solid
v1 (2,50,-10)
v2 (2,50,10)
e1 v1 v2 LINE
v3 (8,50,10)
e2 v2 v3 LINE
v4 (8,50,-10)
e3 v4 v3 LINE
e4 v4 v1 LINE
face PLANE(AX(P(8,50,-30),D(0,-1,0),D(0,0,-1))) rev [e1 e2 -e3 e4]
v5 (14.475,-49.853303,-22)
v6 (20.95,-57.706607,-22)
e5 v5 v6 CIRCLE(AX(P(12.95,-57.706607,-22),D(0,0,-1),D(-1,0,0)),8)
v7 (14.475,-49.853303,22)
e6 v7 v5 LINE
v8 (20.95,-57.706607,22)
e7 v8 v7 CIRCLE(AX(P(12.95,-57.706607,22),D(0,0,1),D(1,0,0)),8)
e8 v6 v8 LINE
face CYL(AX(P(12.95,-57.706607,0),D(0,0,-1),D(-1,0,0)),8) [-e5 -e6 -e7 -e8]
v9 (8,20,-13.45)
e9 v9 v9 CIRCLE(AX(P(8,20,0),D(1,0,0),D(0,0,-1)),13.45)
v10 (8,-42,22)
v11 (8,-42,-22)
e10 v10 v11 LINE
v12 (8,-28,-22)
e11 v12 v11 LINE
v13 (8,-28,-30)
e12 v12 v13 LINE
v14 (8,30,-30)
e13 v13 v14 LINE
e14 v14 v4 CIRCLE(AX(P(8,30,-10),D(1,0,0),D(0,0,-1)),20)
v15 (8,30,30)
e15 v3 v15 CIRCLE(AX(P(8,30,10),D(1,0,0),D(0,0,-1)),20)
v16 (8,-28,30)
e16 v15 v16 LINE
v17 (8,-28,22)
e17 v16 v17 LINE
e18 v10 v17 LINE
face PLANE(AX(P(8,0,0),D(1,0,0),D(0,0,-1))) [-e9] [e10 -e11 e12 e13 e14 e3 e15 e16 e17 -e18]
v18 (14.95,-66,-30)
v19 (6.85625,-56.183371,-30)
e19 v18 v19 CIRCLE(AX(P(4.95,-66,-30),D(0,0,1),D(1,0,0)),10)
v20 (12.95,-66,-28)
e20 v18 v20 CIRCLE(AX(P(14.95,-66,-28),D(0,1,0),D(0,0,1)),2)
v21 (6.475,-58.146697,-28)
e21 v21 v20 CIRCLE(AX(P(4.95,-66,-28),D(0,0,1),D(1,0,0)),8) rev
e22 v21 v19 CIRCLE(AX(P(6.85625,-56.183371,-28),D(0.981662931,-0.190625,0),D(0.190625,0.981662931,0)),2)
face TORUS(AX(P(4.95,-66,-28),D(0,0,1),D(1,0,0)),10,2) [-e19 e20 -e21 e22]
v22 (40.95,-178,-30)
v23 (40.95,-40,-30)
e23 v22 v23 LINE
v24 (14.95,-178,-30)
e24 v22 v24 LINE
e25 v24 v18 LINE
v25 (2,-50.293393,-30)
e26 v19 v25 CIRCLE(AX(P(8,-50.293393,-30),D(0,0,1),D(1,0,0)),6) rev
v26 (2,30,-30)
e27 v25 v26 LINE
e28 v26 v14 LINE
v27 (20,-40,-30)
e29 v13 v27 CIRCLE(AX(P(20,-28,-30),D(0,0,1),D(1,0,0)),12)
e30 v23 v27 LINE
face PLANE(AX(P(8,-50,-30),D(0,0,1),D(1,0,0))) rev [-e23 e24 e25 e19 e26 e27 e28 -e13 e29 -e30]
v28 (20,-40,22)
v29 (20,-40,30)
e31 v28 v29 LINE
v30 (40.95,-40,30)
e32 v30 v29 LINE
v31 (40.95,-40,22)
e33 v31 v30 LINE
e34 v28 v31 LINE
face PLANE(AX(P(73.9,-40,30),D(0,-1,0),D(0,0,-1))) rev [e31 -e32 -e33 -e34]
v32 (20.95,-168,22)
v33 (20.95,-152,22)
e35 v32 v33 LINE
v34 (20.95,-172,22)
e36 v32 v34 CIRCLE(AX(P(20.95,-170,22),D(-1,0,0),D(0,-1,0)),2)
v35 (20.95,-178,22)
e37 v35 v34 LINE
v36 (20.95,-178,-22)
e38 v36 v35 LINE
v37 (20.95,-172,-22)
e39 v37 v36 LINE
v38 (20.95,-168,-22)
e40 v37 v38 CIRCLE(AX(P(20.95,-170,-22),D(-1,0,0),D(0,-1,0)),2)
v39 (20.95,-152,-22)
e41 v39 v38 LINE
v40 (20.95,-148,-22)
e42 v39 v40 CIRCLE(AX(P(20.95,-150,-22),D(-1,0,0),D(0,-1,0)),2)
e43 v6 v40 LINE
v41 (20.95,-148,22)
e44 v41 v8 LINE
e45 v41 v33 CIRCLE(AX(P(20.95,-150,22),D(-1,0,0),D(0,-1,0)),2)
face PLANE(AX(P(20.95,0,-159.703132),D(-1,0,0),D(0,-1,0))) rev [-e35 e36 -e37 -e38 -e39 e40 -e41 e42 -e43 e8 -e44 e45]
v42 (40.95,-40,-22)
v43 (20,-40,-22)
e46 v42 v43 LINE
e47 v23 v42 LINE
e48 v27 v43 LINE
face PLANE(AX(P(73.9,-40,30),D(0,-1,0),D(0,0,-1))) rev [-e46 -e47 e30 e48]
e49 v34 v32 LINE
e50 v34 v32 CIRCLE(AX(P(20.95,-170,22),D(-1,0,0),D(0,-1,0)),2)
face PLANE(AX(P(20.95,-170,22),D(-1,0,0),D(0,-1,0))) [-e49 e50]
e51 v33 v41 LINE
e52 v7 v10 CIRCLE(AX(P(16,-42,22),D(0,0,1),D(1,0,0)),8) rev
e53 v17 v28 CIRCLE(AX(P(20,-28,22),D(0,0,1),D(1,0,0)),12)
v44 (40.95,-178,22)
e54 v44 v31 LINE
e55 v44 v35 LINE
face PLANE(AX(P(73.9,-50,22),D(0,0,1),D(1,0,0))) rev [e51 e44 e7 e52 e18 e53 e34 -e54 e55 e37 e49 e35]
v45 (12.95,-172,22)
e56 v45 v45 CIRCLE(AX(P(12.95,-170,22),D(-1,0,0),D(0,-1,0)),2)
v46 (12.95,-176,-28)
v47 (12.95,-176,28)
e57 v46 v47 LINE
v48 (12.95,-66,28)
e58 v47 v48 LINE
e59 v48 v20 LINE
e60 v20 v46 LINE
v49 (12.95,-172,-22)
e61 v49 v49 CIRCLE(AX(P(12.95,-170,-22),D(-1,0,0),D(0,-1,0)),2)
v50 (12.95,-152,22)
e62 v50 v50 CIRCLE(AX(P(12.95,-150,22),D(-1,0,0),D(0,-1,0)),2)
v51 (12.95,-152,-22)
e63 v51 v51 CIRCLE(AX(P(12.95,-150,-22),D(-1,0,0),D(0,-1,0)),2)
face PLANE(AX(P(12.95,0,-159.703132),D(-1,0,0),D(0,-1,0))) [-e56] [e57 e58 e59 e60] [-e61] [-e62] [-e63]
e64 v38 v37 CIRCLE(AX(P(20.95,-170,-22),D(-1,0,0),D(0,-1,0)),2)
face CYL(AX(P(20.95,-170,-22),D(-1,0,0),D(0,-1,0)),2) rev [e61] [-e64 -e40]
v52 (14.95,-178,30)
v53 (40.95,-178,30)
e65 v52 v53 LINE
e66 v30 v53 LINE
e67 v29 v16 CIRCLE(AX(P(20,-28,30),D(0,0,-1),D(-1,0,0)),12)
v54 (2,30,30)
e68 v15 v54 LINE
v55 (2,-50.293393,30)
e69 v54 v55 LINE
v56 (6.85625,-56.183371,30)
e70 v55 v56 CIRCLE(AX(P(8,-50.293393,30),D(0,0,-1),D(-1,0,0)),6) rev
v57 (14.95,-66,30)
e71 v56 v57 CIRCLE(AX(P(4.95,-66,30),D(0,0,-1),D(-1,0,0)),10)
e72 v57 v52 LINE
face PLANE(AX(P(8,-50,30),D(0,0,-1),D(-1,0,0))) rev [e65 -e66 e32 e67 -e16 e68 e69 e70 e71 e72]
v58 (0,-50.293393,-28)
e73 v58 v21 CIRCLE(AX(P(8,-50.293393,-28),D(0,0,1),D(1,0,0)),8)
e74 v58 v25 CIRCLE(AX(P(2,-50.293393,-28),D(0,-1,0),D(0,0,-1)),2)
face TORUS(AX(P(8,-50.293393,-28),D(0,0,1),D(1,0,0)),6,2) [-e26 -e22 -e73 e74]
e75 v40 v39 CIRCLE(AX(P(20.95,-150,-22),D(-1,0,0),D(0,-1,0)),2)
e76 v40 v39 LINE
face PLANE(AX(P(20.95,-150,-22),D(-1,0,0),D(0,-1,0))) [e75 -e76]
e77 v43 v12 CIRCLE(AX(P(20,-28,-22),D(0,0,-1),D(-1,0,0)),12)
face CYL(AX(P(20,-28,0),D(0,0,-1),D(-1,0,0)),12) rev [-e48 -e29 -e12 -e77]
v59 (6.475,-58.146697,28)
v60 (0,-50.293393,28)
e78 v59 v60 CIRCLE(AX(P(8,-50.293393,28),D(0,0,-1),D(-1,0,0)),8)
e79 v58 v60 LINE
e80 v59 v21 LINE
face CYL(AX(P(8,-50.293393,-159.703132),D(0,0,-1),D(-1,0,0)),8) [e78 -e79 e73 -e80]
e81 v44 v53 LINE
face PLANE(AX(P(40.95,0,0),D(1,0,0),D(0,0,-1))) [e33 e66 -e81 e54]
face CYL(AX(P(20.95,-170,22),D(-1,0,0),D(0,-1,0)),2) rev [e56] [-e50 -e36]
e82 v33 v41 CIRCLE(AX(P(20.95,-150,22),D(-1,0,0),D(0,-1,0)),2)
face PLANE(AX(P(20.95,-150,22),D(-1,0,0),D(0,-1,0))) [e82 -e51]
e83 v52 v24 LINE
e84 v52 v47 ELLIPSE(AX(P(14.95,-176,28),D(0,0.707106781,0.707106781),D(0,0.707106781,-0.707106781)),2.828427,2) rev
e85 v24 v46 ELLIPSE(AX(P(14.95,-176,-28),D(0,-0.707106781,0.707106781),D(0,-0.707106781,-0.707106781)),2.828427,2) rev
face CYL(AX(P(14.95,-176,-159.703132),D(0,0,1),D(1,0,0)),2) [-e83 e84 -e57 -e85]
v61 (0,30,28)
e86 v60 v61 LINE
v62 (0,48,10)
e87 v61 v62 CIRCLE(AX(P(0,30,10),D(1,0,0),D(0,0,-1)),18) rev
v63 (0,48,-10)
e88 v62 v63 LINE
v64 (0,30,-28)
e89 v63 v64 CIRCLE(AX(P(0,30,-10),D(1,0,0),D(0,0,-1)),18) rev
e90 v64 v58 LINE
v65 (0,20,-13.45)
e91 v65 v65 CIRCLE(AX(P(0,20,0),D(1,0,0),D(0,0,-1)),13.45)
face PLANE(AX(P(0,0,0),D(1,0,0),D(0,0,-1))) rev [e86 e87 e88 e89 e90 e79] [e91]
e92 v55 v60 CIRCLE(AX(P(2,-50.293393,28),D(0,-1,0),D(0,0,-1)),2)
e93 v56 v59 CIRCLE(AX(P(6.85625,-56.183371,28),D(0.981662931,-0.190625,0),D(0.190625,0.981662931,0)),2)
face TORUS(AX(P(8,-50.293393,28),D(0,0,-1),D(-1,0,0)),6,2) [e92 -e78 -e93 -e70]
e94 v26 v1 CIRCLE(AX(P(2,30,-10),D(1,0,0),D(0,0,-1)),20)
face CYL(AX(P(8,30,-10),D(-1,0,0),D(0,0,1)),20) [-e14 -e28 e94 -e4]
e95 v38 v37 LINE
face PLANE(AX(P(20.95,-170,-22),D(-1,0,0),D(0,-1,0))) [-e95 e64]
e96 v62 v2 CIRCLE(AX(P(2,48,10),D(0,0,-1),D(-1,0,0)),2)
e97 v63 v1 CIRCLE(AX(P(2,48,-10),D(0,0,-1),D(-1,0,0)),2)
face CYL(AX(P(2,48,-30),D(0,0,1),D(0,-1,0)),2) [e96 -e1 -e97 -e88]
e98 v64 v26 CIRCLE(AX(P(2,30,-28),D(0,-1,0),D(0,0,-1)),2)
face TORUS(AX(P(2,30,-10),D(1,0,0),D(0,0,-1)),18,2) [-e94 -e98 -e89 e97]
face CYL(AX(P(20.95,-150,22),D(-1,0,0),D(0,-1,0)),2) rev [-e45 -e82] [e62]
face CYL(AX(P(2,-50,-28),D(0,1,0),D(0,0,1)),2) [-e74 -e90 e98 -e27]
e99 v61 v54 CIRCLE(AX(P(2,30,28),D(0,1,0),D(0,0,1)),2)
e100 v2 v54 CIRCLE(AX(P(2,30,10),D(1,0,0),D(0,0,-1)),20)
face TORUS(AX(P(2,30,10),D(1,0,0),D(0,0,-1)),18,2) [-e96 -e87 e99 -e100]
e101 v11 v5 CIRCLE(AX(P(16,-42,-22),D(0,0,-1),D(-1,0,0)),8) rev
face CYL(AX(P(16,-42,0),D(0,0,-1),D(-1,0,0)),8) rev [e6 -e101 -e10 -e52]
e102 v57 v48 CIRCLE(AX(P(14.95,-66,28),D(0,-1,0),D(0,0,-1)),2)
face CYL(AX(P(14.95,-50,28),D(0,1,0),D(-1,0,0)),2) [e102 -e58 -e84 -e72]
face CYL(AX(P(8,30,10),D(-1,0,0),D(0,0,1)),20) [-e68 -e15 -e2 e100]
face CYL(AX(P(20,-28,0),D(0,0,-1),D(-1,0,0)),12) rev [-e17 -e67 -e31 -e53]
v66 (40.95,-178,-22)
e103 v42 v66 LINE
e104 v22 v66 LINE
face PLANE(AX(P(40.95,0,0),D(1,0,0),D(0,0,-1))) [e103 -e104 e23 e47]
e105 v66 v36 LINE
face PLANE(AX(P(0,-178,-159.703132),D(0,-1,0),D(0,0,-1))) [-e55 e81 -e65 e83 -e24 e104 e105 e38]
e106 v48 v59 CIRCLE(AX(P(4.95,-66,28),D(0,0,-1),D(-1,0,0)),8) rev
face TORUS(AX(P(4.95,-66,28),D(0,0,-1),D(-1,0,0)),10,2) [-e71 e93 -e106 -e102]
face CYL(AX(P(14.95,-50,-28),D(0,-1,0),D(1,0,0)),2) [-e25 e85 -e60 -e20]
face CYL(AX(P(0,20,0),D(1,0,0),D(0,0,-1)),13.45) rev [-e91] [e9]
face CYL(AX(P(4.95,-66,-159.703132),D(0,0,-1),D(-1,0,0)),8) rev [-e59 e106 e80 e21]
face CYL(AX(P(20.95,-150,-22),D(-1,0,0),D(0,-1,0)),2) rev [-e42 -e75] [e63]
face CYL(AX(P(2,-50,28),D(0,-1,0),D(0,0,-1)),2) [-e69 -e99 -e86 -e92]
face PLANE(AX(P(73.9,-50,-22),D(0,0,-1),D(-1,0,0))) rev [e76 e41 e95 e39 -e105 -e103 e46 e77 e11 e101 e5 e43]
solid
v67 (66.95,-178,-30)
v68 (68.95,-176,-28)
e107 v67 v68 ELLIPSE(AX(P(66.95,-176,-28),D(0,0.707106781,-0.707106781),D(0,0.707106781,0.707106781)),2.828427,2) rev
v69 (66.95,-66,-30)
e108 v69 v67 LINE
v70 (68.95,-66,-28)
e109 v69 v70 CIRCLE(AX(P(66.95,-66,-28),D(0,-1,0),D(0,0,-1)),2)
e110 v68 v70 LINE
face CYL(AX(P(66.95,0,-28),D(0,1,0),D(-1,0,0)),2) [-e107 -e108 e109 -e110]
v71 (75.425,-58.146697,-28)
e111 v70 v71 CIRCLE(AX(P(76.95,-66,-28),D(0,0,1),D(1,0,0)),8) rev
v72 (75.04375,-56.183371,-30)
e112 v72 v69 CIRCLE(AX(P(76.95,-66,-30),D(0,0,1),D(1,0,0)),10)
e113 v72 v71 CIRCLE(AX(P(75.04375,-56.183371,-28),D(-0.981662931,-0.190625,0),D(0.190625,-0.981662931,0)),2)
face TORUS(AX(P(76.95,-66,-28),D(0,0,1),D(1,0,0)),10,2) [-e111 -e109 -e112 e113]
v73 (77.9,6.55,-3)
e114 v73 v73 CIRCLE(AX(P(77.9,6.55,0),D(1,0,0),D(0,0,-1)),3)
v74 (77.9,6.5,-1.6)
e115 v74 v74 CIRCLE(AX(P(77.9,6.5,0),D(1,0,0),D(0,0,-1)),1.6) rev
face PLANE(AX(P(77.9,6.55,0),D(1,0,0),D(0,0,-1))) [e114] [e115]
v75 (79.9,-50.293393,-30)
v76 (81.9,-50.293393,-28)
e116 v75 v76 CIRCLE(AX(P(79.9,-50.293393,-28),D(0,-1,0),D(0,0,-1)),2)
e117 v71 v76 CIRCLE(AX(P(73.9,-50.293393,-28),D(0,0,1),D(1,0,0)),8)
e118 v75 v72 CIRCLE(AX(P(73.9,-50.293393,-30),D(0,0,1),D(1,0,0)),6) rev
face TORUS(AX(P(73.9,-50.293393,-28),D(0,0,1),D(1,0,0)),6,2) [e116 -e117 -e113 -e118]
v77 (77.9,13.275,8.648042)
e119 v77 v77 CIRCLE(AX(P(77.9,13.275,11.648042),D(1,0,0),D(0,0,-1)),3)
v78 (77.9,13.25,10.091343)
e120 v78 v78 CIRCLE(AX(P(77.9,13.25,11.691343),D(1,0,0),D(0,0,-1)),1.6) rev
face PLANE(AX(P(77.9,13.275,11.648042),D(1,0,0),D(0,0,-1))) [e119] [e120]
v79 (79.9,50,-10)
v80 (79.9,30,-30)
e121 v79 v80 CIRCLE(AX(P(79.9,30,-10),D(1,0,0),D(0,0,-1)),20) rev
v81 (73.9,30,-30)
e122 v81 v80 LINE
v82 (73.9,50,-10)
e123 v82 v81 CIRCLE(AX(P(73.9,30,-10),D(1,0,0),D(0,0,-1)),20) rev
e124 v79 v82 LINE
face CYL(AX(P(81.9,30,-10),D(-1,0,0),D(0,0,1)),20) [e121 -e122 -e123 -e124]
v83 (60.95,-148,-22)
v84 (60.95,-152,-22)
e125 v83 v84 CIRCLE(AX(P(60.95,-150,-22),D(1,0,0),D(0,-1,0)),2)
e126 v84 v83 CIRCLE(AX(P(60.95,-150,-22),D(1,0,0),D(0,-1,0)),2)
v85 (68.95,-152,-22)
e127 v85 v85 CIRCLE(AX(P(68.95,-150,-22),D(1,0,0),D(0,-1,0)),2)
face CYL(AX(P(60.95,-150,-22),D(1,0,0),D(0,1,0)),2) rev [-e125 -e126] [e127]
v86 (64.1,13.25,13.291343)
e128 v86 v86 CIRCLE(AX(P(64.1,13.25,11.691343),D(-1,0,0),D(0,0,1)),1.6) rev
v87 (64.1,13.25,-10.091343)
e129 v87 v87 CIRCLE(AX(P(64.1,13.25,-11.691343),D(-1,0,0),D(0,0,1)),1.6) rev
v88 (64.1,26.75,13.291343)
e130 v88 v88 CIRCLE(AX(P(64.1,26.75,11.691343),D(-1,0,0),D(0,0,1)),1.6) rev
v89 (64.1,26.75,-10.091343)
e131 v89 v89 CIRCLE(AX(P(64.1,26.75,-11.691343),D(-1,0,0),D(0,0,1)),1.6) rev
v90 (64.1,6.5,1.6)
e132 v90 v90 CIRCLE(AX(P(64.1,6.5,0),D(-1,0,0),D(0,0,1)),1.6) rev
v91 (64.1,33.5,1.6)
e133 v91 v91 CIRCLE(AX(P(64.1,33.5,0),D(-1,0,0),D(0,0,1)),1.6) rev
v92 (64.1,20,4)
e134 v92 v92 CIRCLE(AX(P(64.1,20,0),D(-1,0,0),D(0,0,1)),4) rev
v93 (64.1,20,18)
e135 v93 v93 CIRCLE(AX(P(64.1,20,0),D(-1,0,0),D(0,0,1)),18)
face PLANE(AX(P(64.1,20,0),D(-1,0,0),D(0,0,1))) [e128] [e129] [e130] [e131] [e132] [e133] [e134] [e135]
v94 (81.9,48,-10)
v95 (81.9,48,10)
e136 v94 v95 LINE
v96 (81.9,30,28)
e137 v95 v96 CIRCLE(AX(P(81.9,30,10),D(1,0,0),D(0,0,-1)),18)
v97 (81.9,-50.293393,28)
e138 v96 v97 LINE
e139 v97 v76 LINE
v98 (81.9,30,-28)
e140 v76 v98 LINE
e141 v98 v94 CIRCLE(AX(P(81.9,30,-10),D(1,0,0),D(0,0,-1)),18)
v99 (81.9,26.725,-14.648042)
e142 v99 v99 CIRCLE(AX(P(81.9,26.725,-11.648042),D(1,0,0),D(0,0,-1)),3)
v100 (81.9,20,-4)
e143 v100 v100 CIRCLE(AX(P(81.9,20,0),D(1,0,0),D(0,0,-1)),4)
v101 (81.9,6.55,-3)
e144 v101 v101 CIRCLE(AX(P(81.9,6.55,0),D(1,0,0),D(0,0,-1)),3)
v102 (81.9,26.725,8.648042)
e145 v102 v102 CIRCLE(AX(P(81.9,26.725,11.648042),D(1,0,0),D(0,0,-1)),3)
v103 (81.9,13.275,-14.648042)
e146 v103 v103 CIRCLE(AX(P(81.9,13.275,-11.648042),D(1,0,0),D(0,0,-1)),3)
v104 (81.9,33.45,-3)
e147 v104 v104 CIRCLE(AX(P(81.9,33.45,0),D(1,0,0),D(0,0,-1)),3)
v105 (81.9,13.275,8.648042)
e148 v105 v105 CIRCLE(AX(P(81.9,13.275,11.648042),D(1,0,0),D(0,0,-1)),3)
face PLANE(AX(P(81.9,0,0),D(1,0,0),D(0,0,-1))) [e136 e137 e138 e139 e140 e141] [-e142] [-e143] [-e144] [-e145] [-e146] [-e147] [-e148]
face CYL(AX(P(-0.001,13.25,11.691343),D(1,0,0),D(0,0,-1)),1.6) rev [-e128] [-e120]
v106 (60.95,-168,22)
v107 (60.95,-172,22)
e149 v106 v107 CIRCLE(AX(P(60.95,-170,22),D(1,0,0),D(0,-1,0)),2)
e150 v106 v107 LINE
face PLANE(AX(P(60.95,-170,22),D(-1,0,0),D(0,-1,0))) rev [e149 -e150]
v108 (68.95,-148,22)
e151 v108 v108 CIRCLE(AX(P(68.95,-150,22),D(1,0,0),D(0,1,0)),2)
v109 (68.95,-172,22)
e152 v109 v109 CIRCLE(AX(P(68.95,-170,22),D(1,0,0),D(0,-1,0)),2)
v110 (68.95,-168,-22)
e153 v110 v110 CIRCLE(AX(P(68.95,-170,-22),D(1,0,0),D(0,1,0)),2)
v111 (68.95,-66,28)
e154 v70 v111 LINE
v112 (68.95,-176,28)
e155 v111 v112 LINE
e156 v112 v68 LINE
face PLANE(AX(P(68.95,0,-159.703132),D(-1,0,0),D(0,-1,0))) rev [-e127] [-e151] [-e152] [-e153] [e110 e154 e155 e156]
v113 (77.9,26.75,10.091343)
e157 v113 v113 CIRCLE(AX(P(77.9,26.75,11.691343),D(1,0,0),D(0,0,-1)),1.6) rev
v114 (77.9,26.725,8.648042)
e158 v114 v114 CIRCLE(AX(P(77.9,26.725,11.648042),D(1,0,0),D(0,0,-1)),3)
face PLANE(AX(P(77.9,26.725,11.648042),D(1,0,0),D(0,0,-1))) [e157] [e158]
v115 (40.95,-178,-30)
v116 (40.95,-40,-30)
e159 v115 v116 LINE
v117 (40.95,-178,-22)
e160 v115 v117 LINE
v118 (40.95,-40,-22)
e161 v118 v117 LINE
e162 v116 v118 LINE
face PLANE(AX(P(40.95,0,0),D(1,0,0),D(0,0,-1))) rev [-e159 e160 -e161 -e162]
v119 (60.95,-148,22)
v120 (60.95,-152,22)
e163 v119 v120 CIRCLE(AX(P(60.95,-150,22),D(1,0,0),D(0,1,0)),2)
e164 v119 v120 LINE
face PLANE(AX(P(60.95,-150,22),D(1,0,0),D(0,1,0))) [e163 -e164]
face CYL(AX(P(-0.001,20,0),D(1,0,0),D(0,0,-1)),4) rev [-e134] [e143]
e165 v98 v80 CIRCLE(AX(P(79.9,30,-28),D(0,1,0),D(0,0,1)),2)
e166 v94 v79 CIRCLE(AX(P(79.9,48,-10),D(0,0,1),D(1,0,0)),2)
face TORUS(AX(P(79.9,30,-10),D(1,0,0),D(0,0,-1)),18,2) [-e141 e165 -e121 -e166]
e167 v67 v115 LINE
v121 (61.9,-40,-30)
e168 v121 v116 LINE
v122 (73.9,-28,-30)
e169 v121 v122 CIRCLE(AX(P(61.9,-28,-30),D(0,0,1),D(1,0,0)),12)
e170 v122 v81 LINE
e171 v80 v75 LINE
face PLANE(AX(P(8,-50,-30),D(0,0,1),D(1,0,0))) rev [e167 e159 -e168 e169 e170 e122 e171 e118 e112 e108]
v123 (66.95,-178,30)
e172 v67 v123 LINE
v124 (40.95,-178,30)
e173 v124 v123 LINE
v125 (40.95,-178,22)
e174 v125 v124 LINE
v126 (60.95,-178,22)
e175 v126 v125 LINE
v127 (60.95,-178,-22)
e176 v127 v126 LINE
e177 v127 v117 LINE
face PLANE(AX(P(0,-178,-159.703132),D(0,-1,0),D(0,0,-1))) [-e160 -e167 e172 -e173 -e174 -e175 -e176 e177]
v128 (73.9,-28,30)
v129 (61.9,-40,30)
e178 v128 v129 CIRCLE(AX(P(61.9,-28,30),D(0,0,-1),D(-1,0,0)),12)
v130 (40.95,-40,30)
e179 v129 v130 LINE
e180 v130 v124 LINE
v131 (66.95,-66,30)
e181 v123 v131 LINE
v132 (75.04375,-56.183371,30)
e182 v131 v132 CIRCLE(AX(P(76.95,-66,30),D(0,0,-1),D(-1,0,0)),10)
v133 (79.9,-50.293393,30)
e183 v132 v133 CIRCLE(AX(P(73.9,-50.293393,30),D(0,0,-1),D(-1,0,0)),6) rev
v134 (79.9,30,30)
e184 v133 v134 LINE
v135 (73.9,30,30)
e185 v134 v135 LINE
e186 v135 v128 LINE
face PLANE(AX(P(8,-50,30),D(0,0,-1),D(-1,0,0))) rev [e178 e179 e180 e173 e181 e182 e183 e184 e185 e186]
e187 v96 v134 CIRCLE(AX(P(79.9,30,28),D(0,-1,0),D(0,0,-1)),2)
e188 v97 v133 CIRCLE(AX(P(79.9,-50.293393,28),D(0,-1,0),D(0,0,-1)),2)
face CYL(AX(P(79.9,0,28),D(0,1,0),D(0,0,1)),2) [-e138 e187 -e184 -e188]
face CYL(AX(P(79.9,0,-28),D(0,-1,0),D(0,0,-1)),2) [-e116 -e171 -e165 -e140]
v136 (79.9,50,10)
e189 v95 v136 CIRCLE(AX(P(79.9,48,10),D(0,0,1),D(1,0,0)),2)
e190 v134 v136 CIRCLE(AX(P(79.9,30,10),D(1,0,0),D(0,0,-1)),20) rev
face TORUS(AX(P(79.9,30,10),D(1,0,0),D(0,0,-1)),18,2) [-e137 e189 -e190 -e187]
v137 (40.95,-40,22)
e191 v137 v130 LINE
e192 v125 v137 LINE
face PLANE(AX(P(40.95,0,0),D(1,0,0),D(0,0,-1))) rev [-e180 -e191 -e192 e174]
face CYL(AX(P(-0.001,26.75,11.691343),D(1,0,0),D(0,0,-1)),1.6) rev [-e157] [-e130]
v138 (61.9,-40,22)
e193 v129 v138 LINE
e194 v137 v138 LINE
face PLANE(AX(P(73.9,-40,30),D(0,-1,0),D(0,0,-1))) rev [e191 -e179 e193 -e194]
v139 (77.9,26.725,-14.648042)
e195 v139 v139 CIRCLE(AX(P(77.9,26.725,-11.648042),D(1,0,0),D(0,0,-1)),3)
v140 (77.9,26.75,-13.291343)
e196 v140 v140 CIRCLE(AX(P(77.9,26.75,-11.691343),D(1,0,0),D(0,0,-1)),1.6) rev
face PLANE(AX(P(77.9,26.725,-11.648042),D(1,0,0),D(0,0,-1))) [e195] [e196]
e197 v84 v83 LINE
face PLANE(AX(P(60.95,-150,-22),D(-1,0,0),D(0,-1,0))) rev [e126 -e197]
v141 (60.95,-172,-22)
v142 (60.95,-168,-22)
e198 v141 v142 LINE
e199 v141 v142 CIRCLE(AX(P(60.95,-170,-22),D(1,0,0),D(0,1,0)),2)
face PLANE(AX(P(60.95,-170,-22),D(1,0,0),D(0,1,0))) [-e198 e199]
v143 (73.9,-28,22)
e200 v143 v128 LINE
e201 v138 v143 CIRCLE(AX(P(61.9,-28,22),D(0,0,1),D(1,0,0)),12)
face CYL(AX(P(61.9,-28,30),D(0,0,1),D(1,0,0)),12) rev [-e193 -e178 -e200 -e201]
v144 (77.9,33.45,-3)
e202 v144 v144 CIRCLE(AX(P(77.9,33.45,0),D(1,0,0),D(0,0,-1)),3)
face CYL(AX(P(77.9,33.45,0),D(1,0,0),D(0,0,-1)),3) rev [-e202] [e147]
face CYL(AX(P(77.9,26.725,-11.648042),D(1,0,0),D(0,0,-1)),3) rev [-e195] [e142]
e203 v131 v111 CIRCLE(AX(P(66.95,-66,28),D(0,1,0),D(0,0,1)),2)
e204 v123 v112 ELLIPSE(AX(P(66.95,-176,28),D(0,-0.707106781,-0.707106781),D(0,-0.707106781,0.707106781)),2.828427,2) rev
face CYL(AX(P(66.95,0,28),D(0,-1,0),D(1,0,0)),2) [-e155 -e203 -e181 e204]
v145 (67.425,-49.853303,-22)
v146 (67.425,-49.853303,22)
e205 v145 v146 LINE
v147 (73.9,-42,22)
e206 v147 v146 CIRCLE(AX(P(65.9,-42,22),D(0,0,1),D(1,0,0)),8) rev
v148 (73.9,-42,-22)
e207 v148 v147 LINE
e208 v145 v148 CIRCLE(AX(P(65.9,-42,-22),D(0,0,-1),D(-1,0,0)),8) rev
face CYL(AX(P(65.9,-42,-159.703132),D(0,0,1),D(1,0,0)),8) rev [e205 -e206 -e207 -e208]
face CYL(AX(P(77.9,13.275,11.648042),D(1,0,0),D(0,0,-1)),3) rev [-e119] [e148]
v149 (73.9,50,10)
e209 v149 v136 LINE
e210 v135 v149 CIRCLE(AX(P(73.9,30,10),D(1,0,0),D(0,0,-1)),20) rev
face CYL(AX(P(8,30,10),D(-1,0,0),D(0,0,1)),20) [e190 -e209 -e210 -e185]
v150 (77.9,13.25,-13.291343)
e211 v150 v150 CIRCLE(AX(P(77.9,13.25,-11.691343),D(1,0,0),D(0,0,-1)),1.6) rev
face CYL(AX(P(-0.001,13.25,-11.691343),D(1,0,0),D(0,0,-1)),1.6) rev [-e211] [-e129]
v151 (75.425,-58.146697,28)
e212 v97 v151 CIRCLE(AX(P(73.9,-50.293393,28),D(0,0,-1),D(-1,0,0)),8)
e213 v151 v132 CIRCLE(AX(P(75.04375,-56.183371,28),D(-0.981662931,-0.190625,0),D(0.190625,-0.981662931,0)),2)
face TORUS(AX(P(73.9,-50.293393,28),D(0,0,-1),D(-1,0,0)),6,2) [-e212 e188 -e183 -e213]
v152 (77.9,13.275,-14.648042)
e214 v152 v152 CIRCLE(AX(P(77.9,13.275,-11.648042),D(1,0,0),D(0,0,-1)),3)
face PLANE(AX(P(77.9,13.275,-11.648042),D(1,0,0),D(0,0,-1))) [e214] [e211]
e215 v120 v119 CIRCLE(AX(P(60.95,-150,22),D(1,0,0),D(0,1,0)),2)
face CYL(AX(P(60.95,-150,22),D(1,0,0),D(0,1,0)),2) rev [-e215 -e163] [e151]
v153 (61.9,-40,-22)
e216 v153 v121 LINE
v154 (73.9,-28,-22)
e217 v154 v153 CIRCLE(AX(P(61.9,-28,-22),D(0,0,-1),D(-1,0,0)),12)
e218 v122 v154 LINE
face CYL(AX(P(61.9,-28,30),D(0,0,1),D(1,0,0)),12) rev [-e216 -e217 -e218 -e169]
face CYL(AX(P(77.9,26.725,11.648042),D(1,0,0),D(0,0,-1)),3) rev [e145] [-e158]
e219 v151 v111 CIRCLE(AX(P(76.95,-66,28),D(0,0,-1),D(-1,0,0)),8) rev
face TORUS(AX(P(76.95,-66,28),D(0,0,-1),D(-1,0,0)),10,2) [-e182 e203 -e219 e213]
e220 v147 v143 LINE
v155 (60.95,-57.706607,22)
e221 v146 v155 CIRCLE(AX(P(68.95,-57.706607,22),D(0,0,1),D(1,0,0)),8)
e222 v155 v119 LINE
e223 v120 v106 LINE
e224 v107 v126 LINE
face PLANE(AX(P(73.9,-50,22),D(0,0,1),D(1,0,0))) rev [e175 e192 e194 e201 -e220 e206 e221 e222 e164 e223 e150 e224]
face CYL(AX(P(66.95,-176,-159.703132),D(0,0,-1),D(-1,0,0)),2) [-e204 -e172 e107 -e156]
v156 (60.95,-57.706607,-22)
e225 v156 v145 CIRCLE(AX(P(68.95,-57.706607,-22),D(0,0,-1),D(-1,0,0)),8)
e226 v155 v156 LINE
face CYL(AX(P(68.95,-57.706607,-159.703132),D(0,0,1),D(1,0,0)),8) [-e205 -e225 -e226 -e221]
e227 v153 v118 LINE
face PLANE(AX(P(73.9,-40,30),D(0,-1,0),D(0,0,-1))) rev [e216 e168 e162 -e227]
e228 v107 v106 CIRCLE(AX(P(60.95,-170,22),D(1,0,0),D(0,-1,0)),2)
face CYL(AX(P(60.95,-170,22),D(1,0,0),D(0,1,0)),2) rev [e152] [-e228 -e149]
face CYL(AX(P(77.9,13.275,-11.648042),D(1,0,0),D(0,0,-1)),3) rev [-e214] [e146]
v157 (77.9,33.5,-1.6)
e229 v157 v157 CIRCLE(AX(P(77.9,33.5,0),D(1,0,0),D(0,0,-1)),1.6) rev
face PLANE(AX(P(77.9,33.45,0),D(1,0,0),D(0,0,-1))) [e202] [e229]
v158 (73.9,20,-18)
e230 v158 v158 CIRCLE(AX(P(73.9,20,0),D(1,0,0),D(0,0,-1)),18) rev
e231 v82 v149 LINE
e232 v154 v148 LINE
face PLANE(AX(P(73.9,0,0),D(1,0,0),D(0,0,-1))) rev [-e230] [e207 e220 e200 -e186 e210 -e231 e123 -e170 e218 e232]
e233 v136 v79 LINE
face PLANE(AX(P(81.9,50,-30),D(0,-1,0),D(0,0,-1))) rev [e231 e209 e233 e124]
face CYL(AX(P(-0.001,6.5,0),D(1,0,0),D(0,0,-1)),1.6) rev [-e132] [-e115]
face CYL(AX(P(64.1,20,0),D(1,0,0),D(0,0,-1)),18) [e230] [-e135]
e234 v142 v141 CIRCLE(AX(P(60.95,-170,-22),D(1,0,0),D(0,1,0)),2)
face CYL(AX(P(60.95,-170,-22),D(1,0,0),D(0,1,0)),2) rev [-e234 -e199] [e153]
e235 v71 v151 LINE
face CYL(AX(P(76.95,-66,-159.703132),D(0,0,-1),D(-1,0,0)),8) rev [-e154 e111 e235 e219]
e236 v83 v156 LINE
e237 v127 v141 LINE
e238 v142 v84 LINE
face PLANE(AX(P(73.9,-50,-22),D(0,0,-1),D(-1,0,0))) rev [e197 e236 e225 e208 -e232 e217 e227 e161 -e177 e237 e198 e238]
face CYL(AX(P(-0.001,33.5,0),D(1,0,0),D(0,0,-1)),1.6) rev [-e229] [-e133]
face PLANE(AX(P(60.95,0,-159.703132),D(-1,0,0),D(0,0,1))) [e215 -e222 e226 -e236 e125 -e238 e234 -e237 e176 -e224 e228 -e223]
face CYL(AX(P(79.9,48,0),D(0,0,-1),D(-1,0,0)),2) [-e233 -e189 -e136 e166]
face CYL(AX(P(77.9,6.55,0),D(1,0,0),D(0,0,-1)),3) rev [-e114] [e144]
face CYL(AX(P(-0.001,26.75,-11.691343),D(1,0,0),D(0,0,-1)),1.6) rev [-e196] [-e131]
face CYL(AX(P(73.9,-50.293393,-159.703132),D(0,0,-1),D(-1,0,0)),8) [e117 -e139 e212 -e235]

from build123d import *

# Parameters (mm, degrees)
SKETCH_1_W          = 60
SKETCH_1_H          = 100
EXTRUDE_1_DEPTH     = 8
SKETCH_2_R          = 13.45
CUT_EXTRUDE_1_DEPTH = 59.855755878
SKETCH_3_W          = 8
SKETCH_3_H          = 40
EXTRUDE_2_DEPTH     = 65.9
SKETCH_4_W          = 60
SKETCH_4_H          = 100
EXTRUDE_3_DEPTH     = 8
CUT_EXTRUDE_2_REACH = 102.537
SKETCH_10_R         = 4
SKETCH_10_R_2       = 1.6
SKETCH_15_R         = 18
EXTRUDE_4_DEPTH     = 9.8
SKETCH_12_R         = 3
CUT_EXTRUDE_4_DEPTH = 4
CUT_EXTRUDE_7_REACH = 102.537
SKETCH_10_2_R       = 4
SKETCH_10_2_R_2     = 1.6
SKETCH1_W           = 65.9
SKETCH1_H           = 30
CUT_EXTRUDE1_DEPTH  = 114.170711759
SKETCH2_W           = 8
SKETCH2_H           = 120
BOSS_EXTRUDE3_DEPTH = 60
FILLET1_R           = 12
FILLET3_R           = 8
FILLET4_R           = 8
BOSS_EXTRUDE4_REACH = 192.523
SKETCH3_W           = 8
SKETCH3_H           = 128
FILLET5_R           = 20
FILLET6_R           = 2
SKETCH7_R           = 2
CUT_EXTRUDE2_DEPTH  = 8
CUT_EXTRUDE3_START  = -48
SKETCH7_2_R         = 2
CUT_EXTRUDE3_DEPTH  = 8


with BuildPart() as part:
    # 草图1 → 凸台-拉伸1 (new body)
    with BuildSketch(Plane(origin=(0, 0, 0), x_dir=(0, 0, -1), z_dir=(1, 0, 0))):
        Rectangle(SKETCH_1_W, SKETCH_1_H)
    extrude(amount=EXTRUDE_1_DEPTH)

    # 草图2 → 切除-拉伸1 (cut, through all)
    with BuildSketch(Plane(origin=(8, 0, 0), x_dir=(0, 0, -1), z_dir=(1, 0, 0))):
        with Locations((0, 20)):
            Circle(SKETCH_2_R)
    extrude(amount=-CUT_EXTRUDE_1_DEPTH, mode=Mode.SUBTRACT)

    # 草图3 → 凸台-拉伸2 (add)
    with BuildSketch(Plane(origin=(8, 0, 0), x_dir=(0, 0, -1), z_dir=(1, 0, 0))):
        with Locations((-26, -30)):
            Rectangle(SKETCH_3_W, SKETCH_3_H)
        with Locations((26, -30)):
            Rectangle(SKETCH_3_W, SKETCH_3_H)
    extrude(amount=EXTRUDE_2_DEPTH)

    # 草图4 → 凸台-拉伸3 (add)
    with BuildSketch(Plane(origin=(73.9, 0, 0), x_dir=(0, 0, -1), z_dir=(1, 0, 0))):
        Rectangle(SKETCH_4_W, SKETCH_4_H)
    extrude(amount=EXTRUDE_3_DEPTH)

    # 草图10 → 切除-拉伸2 (cut, up to next)
    with BuildSketch(Plane(origin=(81.9, 0, 0), x_dir=(0, 0, -1), z_dir=(1, 0, 0)), mode=Mode.PRIVATE) as cut_extrude_2_sk1:
        with Locations((0, 20)):
            Circle(SKETCH_10_R)
    cut_extrude_2_tool1 = extrude(cut_extrude_2_sk1.sketch, amount=-CUT_EXTRUDE_2_REACH, mode=Mode.PRIVATE) & part.part
    # 草图10 → 切除-拉伸2 (cut, up to next)
    with BuildSketch(Plane(origin=(81.9, 0, 0), x_dir=(0, 0, -1), z_dir=(1, 0, 0)), mode=Mode.PRIVATE) as cut_extrude_2_sk2:
        with Locations((0, 33.5)):
            Circle(SKETCH_10_R_2)
    cut_extrude_2_tool2 = extrude(cut_extrude_2_sk2.sketch, amount=-CUT_EXTRUDE_2_REACH, mode=Mode.PRIVATE) & part.part
    # 草图10 → 切除-拉伸2 (cut, up to next)
    with BuildSketch(Plane(origin=(81.9, 0, 0), x_dir=(0, 0, -1), z_dir=(1, 0, 0)), mode=Mode.PRIVATE) as cut_extrude_2_sk3:
        with Locations((11.691342951, 26.75)):
            Circle(SKETCH_10_R_2)
    cut_extrude_2_tool3 = extrude(cut_extrude_2_sk3.sketch, amount=-CUT_EXTRUDE_2_REACH, mode=Mode.PRIVATE) & part.part
    # 草图10 → 切除-拉伸2 (cut, up to next)
    with BuildSketch(Plane(origin=(81.9, 0, 0), x_dir=(0, 0, -1), z_dir=(1, 0, 0)), mode=Mode.PRIVATE) as cut_extrude_2_sk4:
        with Locations((11.691342951, 13.25)):
            Circle(SKETCH_10_R_2)
    cut_extrude_2_tool4 = extrude(cut_extrude_2_sk4.sketch, amount=-CUT_EXTRUDE_2_REACH, mode=Mode.PRIVATE) & part.part
    # 草图10 → 切除-拉伸2 (cut, up to next)
    with BuildSketch(Plane(origin=(81.9, 0, 0), x_dir=(0, 0, -1), z_dir=(1, 0, 0)), mode=Mode.PRIVATE) as cut_extrude_2_sk5:
        with Locations((0, 6.5)):
            Circle(SKETCH_10_R_2)
    cut_extrude_2_tool5 = extrude(cut_extrude_2_sk5.sketch, amount=-CUT_EXTRUDE_2_REACH, mode=Mode.PRIVATE) & part.part
    # 草图10 → 切除-拉伸2 (cut, up to next)
    with BuildSketch(Plane(origin=(81.9, 0, 0), x_dir=(0, 0, -1), z_dir=(1, 0, 0)), mode=Mode.PRIVATE) as cut_extrude_2_sk6:
        with Locations((-11.691342951, 13.25)):
            Circle(SKETCH_10_R_2)
    cut_extrude_2_tool6 = extrude(cut_extrude_2_sk6.sketch, amount=-CUT_EXTRUDE_2_REACH, mode=Mode.PRIVATE) & part.part
    # 草图10 → 切除-拉伸2 (cut, up to next)
    with BuildSketch(Plane(origin=(81.9, 0, 0), x_dir=(0, 0, -1), z_dir=(1, 0, 0)), mode=Mode.PRIVATE) as cut_extrude_2_sk7:
        with Locations((-11.691342951, 26.75)):
            Circle(SKETCH_10_R_2)
    cut_extrude_2_tool7 = extrude(cut_extrude_2_sk7.sketch, amount=-CUT_EXTRUDE_2_REACH, mode=Mode.PRIVATE) & part.part
    add(cut_extrude_2_tool1.solids().sort_by_distance((81.9, 20, 0))[0], mode=Mode.SUBTRACT)
    add(cut_extrude_2_tool2.solids().sort_by_distance((81.9, 33.5, 0))[0], mode=Mode.SUBTRACT)
    add(cut_extrude_2_tool3.solids().sort_by_distance((81.9, 26.75, -11.691343))[0], mode=Mode.SUBTRACT)
    add(cut_extrude_2_tool4.solids().sort_by_distance((81.9, 13.25, -11.691343))[0], mode=Mode.SUBTRACT)
    add(cut_extrude_2_tool5.solids().sort_by_distance((81.9, 6.5, 0))[0], mode=Mode.SUBTRACT)
    add(cut_extrude_2_tool6.solids().sort_by_distance((81.9, 13.25, 11.691343))[0], mode=Mode.SUBTRACT)
    add(cut_extrude_2_tool7.solids().sort_by_distance((81.9, 26.75, 11.691343))[0], mode=Mode.SUBTRACT)

    # 草图15 → 凸台-拉伸4 (add)
    with BuildSketch(Plane.ZY.offset(-73.9)):
        with Locations(Location((0, 20, 0), (0, 0, 180))):
            Circle(SKETCH_15_R)
    extrude(amount=EXTRUDE_4_DEPTH)

    # 草图12 → 切除-拉伸4 (cut)
    with BuildSketch(Plane(origin=(81.9, 0, 0), x_dir=(0, 0, -1), z_dir=(1, 0, 0))):
        with Locations((0, 33.45)):
            Circle(SKETCH_12_R)
        with Locations((11.648041681, 26.725)):
            Circle(SKETCH_12_R)
        with Locations((11.648041681, 13.275)):
            Circle(SKETCH_12_R)
        with Locations((0, 6.55)):
            Circle(SKETCH_12_R)
        with Locations((-11.648041681, 13.275)):
            Circle(SKETCH_12_R)
        with Locations((-11.648041681, 26.725)):
            Circle(SKETCH_12_R)
    extrude(amount=-CUT_EXTRUDE_4_DEPTH, mode=Mode.SUBTRACT)

    # 草图10<2> → 切除-拉伸7 (cut, up to next)
    with BuildSketch(Plane(origin=(81.9, 0, 0), x_dir=(0, 0, -1), z_dir=(1, 0, 0)), mode=Mode.PRIVATE) as cut_extrude_7_sk1:
        with Locations((0, 20)):
            Circle(SKETCH_10_2_R)
    cut_extrude_7_tool1 = extrude(cut_extrude_7_sk1.sketch, amount=-CUT_EXTRUDE_7_REACH, mode=Mode.PRIVATE) & part.part
    # 草图10<2> → 切除-拉伸7 (cut, up to next)
    with BuildSketch(Plane(origin=(81.9, 0, 0), x_dir=(0, 0, -1), z_dir=(1, 0, 0)), mode=Mode.PRIVATE) as cut_extrude_7_sk2:
        with Locations((0, 33.5)):
            Circle(SKETCH_10_2_R_2)
    cut_extrude_7_tool2 = extrude(cut_extrude_7_sk2.sketch, amount=-CUT_EXTRUDE_7_REACH, mode=Mode.PRIVATE) & part.part
    # 草图10<2> → 切除-拉伸7 (cut, up to next)
    with BuildSketch(Plane(origin=(81.9, 0, 0), x_dir=(0, 0, -1), z_dir=(1, 0, 0)), mode=Mode.PRIVATE) as cut_extrude_7_sk3:
        with Locations((11.691342951, 26.75)):
            Circle(SKETCH_10_2_R_2)
    cut_extrude_7_tool3 = extrude(cut_extrude_7_sk3.sketch, amount=-CUT_EXTRUDE_7_REACH, mode=Mode.PRIVATE) & part.part
    # 草图10<2> → 切除-拉伸7 (cut, up to next)
    with BuildSketch(Plane(origin=(81.9, 0, 0), x_dir=(0, 0, -1), z_dir=(1, 0, 0)), mode=Mode.PRIVATE) as cut_extrude_7_sk4:
        with Locations((11.691342951, 13.25)):
            Circle(SKETCH_10_2_R_2)
    cut_extrude_7_tool4 = extrude(cut_extrude_7_sk4.sketch, amount=-CUT_EXTRUDE_7_REACH, mode=Mode.PRIVATE) & part.part
    # 草图10<2> → 切除-拉伸7 (cut, up to next)
    with BuildSketch(Plane(origin=(81.9, 0, 0), x_dir=(0, 0, -1), z_dir=(1, 0, 0)), mode=Mode.PRIVATE) as cut_extrude_7_sk5:
        with Locations((0, 6.5)):
            Circle(SKETCH_10_2_R_2)
    cut_extrude_7_tool5 = extrude(cut_extrude_7_sk5.sketch, amount=-CUT_EXTRUDE_7_REACH, mode=Mode.PRIVATE) & part.part
    # 草图10<2> → 切除-拉伸7 (cut, up to next)
    with BuildSketch(Plane(origin=(81.9, 0, 0), x_dir=(0, 0, -1), z_dir=(1, 0, 0)), mode=Mode.PRIVATE) as cut_extrude_7_sk6:
        with Locations((-11.691342951, 13.25)):
            Circle(SKETCH_10_2_R_2)
    cut_extrude_7_tool6 = extrude(cut_extrude_7_sk6.sketch, amount=-CUT_EXTRUDE_7_REACH, mode=Mode.PRIVATE) & part.part
    # 草图10<2> → 切除-拉伸7 (cut, up to next)
    with BuildSketch(Plane(origin=(81.9, 0, 0), x_dir=(0, 0, -1), z_dir=(1, 0, 0)), mode=Mode.PRIVATE) as cut_extrude_7_sk7:
        with Locations((-11.691342951, 26.75)):
            Circle(SKETCH_10_2_R_2)
    cut_extrude_7_tool7 = extrude(cut_extrude_7_sk7.sketch, amount=-CUT_EXTRUDE_7_REACH, mode=Mode.PRIVATE) & part.part
    add(cut_extrude_7_tool1.solids().sort_by_distance((81.9, 20, 0))[0], mode=Mode.SUBTRACT)
    add(cut_extrude_7_tool2.solids().sort_by_distance((81.9, 33.5, 0))[0], mode=Mode.SUBTRACT)
    add(cut_extrude_7_tool3.solids().sort_by_distance((81.9, 26.75, -11.691343))[0], mode=Mode.SUBTRACT)
    add(cut_extrude_7_tool4.solids().sort_by_distance((81.9, 13.25, -11.691343))[0], mode=Mode.SUBTRACT)
    add(cut_extrude_7_tool5.solids().sort_by_distance((81.9, 6.5, 0))[0], mode=Mode.SUBTRACT)
    add(cut_extrude_7_tool6.solids().sort_by_distance((81.9, 13.25, 11.691343))[0], mode=Mode.SUBTRACT)
    add(cut_extrude_7_tool7.solids().sort_by_distance((81.9, 26.75, 11.691343))[0], mode=Mode.SUBTRACT)

    # Sketch1 → Cut-Extrude1 (cut, through all)
    with BuildSketch(Plane(origin=(0, 0, -30), x_dir=(-1, 0, 0), z_dir=(0, 0, -1))):
        with Locations((-40.95, -25)):
            Rectangle(SKETCH1_W, SKETCH1_H)
    extrude(amount=-CUT_EXTRUDE1_DEPTH, mode=Mode.SUBTRACT)

    # Sketch2 → Boss-Extrude3 (add)
    with BuildSketch(Plane.XY.offset(30)):
        with Locations((16.95, -118)):
            Rectangle(SKETCH2_W, SKETCH2_H)
        Polygon((0, -58), (12.95, -58), (20.95, -58), (20.95, -50), (0, -50), align=None)
        with Locations((64.95, -118)):
            Rectangle(SKETCH2_W, SKETCH2_H)
        Polygon((81.9, -50), (60.95, -50), (60.95, -58), (68.95, -58), (81.9, -58), align=None)
    extrude(amount=-BOSS_EXTRUDE3_DEPTH)

    # Fillet1
    fillet1_edges = [part.edges().sort_by_distance(p)[0] for p in [
        (73.9, -40, 26),
        (73.9, -40, -26),
        (8, -40, 26),
        (8, -40, -26),
    ]]
    fillet(fillet1_edges, radius=FILLET1_R)

    # Fillet3
    fillet3_edges = [part.edges().sort_by_distance(p)[0] for p in [
        (8, -50, 0),
        (12.95, -58, 0),
        (68.95, -58, 0),
        (73.9, -50, 0),
    ]]
    fillet(fillet3_edges, radius=FILLET3_R)

    # Fillet4
    # the kernel refuses this fillet: 8 mm, written as the material it adds along each edge
    # the kernel refuses this fillet: 8 mm, written as the material it takes off along each edge
    with BuildSketch(Plane(origin=(20.95, -50, 22), x_dir=(0, -1, 0), z_dir=(0, 0, -1))) as fillet4_2_piece_1:
        with BuildLine():
            CenterArc((7.70660689, 8), FILLET4_R, 190.989260723, 79.010739277)
            Line((-0.146696555, 6.475), (-0.932026899, 6.3225))
            ThreePointArc((-0.932026899, 6.3225), (-0.8, 4.95), (-0.8, 0))
            Line((-0.8, 0), (0, -0.8))
            Line((0, -0.8), (7.70660689, -0.8))
            Line((7.70660689, -0.8), (7.70660689, 0))
        make_face()
    extrude(amount=44, mode=Mode.SUBTRACT)
    with BuildSketch(Plane(origin=(60.95, -50, 22), x_dir=(0, -1, 0), z_dir=(0, 0, -1))) as fillet4_2_piece_2:
        with BuildLine():
            CenterArc((7.70660689, -8), FILLET4_R, 90, 79.010739277)
            Line((-0.146696555, -6.475), (-0.932026899, -6.3225))
            ThreePointArc((-0.932026899, -6.3225), (-0.8, -4.95), (-0.8, 0))
            Line((-0.8, 0), (0, 0.8))
            Line((0, 0.8), (7.70660689, 0.8))
            Line((7.70660689, 0.8), (7.70660689, 0))
        make_face()
    extrude(amount=44, mode=Mode.SUBTRACT)
    with BuildSketch(Plane(origin=(81.9, -58, 49.266517225), x_dir=(0, 1, 0), z_dir=(0, 0, -1))) as fillet4_2_piece_3:
        with BuildLine():
            CenterArc((7.70660689, -8), FILLET4_R, 90, 79.010739277)
            Line((-0.146696555, -6.475), (-0.932026899, -6.3225))
            ThreePointArc((-0.932026899, -6.3225), (-0.8, -4.95), (-0.8, 0))
            Line((-0.8, 0), (0, 0.8))
            Line((0, 0.8), (7.70660689, 0.8))
            Line((7.70660689, 0.8), (7.70660689, 0))
        make_face()
    extrude(amount=98.53303445, mode=Mode.SUBTRACT)
    with BuildSketch(Plane(origin=(0, -58, 49.266517225), x_dir=(0.999743455245202, -0.02265002636609405, 0), z_dir=(0, 0, -1))) as fillet4_2_piece_4:
        with BuildLine():
            CenterArc((7.823392793, -7.885830011), FILLET4_R, 99.691398818, 79.010739277)
            Line((-0.174554849, -7.704629801), (-0.974349613, -7.686509779))
            Line((-0.974349613, -7.686509779), (-0.799794764, 0.018120021))
            Line((-0.799794764, 0.018120021), (0.018120021, 0.799794764))
            ThreePointArc((0.018120021, 0.799794764), (4.966850125, 0.687677134), (6.34198843, 0.788583001))
            Line((6.34198843, 0.788583001), (6.476661554, 0))
        make_face()
    extrude(amount=98.53303445, mode=Mode.SUBTRACT)

    # Sketch3 → Boss-Extrude4 (add, up to next)
    with BuildSketch(Plane(origin=(20.95, 0, 0), x_dir=(0, 0, -1), z_dir=(1, 0, 0)), mode=Mode.PRIVATE) as boss_extrude4_sk1:
        with Locations((-26, -114)):
            Rectangle(SKETCH3_W, SKETCH3_H)
    boss_extrude4_tool1 = extrude(boss_extrude4_sk1.sketch, amount=BOSS_EXTRUDE4_REACH, mode=Mode.PRIVATE) - part.part
    # Sketch3 → Boss-Extrude4 (add, up to next)
    with BuildSketch(Plane(origin=(20.95, 0, 0), x_dir=(0, 0, -1), z_dir=(1, 0, 0)), mode=Mode.PRIVATE) as boss_extrude4_sk2:
        with Locations((26, -114)):
            Rectangle(SKETCH3_W, SKETCH3_H)
    boss_extrude4_tool2 = extrude(boss_extrude4_sk2.sketch, amount=BOSS_EXTRUDE4_REACH, mode=Mode.PRIVATE) - part.part
    add(boss_extrude4_tool1.solids().sort_by_distance((20.95, -114, 26))[0])
    add(boss_extrude4_tool2.solids().sort_by_distance((20.95, -114, -26))[0])

    # Fillet5
    fillet5_edges = [part.edges().sort_by_distance(p)[0] for p in [
        (77.9, 50, 30),
        (77.9, 50, -30),
        (4, 50, 30),
        (4, 50, -30),
    ]]
    fillet(fillet5_edges, radius=FILLET5_R)

    # Fillet6
    fillet6_edges = [part.edges().sort_by_distance(p)[0] for p in [
        (12.95, -178, 0),
        (12.95, -122, -30),
        (68.95, -178, 0),
        (68.95, -122, -30),
        (68.95, -122, 30),
        (12.95, -122, 30),
        (70.777480255, -60.91079574, 30),
        (11.122519745, -60.91079574, -30),
        (70.777480255, -60.91079574, -30),
        (11.122519745, -60.91079574, 30),
        (1.827480255, -55.38259737, 30),
        (80.072519745, -55.38259737, 30),
        (81.9, -10.146696555, -30),
        (0, -10.146696555, -30),
        (1.827480255, -55.38259737, -30),
        (80.072519745, -55.38259737, -30),
        (81.9, -10.146696555, 30),
        (0, -10.146696555, 30),
        (81.9, 50, 0),
        (81.9, 44.142135624, -24.142135624),
        (81.9, 44.142135624, 24.142135624),
        (0, 50, 0),
        (0, 44.142135624, -24.142135624),
        (0, 44.142135624, 24.142135624),
    ]]
    fillet(fillet6_edges, radius=FILLET6_R)

    # Sketch7 → Cut-Extrude2 (cut)
    with BuildSketch(Plane(origin=(68.95, 0, 0), x_dir=(0, 0, -1), z_dir=(1, 0, 0))):
        with Locations(Location((-22, -150, 0), (0, 0, 90))):
            Circle(SKETCH7_R)
        with Locations(Location((22, -150, 0), (0, 0, 270))):
            Circle(SKETCH7_R)
        with Locations(Location((22, -170, 0), (0, 0, 90))):
            Circle(SKETCH7_R)
        with Locations(Location((-22, -170, 0), (0, 0, 270))):
            Circle(SKETCH7_R)
    extrude(amount=-CUT_EXTRUDE2_DEPTH, mode=Mode.SUBTRACT)

    # Sketch7<2> → Cut-Extrude3 (cut)
    with BuildSketch(Plane(origin=(68.95, 0, 0), x_dir=(0, 0, -1), z_dir=(1, 0, 0)).offset(CUT_EXTRUDE3_START)):
        with Locations(Location((-22, -150, 0), (0, 0, 90))):
            Circle(SKETCH7_2_R)
        with Locations(Location((22, -150, 0), (0, 0, 270))):
            Circle(SKETCH7_2_R)
        with Locations(Location((22, -170, 0), (0, 0, 90))):
            Circle(SKETCH7_2_R)
        with Locations(Location((-22, -170, 0), (0, 0, 270))):
            Circle(SKETCH7_2_R)
    extrude(amount=-CUT_EXTRUDE3_DEPTH, mode=Mode.SUBTRACT)


with BuildPart() as body_2:
    # Split Bodies 1: the piece on the far side of the plane
    add(part.part)
    split(bisect_by=Plane(origin=(40.95, 0, 0), x_dir=(0, 0, 1), z_dir=(1, 0, 0)), keep=Keep.BOTTOM)


with BuildPart() as part_1:
    add(part.part)

    # Split Bodies 1
    split(bisect_by=Plane(origin=(40.95, 0, 0), x_dir=(0, 0, 1), z_dir=(1, 0, 0)), keep=Keep.TOP)


solid = Compound([body_2.part, part_1.part])
